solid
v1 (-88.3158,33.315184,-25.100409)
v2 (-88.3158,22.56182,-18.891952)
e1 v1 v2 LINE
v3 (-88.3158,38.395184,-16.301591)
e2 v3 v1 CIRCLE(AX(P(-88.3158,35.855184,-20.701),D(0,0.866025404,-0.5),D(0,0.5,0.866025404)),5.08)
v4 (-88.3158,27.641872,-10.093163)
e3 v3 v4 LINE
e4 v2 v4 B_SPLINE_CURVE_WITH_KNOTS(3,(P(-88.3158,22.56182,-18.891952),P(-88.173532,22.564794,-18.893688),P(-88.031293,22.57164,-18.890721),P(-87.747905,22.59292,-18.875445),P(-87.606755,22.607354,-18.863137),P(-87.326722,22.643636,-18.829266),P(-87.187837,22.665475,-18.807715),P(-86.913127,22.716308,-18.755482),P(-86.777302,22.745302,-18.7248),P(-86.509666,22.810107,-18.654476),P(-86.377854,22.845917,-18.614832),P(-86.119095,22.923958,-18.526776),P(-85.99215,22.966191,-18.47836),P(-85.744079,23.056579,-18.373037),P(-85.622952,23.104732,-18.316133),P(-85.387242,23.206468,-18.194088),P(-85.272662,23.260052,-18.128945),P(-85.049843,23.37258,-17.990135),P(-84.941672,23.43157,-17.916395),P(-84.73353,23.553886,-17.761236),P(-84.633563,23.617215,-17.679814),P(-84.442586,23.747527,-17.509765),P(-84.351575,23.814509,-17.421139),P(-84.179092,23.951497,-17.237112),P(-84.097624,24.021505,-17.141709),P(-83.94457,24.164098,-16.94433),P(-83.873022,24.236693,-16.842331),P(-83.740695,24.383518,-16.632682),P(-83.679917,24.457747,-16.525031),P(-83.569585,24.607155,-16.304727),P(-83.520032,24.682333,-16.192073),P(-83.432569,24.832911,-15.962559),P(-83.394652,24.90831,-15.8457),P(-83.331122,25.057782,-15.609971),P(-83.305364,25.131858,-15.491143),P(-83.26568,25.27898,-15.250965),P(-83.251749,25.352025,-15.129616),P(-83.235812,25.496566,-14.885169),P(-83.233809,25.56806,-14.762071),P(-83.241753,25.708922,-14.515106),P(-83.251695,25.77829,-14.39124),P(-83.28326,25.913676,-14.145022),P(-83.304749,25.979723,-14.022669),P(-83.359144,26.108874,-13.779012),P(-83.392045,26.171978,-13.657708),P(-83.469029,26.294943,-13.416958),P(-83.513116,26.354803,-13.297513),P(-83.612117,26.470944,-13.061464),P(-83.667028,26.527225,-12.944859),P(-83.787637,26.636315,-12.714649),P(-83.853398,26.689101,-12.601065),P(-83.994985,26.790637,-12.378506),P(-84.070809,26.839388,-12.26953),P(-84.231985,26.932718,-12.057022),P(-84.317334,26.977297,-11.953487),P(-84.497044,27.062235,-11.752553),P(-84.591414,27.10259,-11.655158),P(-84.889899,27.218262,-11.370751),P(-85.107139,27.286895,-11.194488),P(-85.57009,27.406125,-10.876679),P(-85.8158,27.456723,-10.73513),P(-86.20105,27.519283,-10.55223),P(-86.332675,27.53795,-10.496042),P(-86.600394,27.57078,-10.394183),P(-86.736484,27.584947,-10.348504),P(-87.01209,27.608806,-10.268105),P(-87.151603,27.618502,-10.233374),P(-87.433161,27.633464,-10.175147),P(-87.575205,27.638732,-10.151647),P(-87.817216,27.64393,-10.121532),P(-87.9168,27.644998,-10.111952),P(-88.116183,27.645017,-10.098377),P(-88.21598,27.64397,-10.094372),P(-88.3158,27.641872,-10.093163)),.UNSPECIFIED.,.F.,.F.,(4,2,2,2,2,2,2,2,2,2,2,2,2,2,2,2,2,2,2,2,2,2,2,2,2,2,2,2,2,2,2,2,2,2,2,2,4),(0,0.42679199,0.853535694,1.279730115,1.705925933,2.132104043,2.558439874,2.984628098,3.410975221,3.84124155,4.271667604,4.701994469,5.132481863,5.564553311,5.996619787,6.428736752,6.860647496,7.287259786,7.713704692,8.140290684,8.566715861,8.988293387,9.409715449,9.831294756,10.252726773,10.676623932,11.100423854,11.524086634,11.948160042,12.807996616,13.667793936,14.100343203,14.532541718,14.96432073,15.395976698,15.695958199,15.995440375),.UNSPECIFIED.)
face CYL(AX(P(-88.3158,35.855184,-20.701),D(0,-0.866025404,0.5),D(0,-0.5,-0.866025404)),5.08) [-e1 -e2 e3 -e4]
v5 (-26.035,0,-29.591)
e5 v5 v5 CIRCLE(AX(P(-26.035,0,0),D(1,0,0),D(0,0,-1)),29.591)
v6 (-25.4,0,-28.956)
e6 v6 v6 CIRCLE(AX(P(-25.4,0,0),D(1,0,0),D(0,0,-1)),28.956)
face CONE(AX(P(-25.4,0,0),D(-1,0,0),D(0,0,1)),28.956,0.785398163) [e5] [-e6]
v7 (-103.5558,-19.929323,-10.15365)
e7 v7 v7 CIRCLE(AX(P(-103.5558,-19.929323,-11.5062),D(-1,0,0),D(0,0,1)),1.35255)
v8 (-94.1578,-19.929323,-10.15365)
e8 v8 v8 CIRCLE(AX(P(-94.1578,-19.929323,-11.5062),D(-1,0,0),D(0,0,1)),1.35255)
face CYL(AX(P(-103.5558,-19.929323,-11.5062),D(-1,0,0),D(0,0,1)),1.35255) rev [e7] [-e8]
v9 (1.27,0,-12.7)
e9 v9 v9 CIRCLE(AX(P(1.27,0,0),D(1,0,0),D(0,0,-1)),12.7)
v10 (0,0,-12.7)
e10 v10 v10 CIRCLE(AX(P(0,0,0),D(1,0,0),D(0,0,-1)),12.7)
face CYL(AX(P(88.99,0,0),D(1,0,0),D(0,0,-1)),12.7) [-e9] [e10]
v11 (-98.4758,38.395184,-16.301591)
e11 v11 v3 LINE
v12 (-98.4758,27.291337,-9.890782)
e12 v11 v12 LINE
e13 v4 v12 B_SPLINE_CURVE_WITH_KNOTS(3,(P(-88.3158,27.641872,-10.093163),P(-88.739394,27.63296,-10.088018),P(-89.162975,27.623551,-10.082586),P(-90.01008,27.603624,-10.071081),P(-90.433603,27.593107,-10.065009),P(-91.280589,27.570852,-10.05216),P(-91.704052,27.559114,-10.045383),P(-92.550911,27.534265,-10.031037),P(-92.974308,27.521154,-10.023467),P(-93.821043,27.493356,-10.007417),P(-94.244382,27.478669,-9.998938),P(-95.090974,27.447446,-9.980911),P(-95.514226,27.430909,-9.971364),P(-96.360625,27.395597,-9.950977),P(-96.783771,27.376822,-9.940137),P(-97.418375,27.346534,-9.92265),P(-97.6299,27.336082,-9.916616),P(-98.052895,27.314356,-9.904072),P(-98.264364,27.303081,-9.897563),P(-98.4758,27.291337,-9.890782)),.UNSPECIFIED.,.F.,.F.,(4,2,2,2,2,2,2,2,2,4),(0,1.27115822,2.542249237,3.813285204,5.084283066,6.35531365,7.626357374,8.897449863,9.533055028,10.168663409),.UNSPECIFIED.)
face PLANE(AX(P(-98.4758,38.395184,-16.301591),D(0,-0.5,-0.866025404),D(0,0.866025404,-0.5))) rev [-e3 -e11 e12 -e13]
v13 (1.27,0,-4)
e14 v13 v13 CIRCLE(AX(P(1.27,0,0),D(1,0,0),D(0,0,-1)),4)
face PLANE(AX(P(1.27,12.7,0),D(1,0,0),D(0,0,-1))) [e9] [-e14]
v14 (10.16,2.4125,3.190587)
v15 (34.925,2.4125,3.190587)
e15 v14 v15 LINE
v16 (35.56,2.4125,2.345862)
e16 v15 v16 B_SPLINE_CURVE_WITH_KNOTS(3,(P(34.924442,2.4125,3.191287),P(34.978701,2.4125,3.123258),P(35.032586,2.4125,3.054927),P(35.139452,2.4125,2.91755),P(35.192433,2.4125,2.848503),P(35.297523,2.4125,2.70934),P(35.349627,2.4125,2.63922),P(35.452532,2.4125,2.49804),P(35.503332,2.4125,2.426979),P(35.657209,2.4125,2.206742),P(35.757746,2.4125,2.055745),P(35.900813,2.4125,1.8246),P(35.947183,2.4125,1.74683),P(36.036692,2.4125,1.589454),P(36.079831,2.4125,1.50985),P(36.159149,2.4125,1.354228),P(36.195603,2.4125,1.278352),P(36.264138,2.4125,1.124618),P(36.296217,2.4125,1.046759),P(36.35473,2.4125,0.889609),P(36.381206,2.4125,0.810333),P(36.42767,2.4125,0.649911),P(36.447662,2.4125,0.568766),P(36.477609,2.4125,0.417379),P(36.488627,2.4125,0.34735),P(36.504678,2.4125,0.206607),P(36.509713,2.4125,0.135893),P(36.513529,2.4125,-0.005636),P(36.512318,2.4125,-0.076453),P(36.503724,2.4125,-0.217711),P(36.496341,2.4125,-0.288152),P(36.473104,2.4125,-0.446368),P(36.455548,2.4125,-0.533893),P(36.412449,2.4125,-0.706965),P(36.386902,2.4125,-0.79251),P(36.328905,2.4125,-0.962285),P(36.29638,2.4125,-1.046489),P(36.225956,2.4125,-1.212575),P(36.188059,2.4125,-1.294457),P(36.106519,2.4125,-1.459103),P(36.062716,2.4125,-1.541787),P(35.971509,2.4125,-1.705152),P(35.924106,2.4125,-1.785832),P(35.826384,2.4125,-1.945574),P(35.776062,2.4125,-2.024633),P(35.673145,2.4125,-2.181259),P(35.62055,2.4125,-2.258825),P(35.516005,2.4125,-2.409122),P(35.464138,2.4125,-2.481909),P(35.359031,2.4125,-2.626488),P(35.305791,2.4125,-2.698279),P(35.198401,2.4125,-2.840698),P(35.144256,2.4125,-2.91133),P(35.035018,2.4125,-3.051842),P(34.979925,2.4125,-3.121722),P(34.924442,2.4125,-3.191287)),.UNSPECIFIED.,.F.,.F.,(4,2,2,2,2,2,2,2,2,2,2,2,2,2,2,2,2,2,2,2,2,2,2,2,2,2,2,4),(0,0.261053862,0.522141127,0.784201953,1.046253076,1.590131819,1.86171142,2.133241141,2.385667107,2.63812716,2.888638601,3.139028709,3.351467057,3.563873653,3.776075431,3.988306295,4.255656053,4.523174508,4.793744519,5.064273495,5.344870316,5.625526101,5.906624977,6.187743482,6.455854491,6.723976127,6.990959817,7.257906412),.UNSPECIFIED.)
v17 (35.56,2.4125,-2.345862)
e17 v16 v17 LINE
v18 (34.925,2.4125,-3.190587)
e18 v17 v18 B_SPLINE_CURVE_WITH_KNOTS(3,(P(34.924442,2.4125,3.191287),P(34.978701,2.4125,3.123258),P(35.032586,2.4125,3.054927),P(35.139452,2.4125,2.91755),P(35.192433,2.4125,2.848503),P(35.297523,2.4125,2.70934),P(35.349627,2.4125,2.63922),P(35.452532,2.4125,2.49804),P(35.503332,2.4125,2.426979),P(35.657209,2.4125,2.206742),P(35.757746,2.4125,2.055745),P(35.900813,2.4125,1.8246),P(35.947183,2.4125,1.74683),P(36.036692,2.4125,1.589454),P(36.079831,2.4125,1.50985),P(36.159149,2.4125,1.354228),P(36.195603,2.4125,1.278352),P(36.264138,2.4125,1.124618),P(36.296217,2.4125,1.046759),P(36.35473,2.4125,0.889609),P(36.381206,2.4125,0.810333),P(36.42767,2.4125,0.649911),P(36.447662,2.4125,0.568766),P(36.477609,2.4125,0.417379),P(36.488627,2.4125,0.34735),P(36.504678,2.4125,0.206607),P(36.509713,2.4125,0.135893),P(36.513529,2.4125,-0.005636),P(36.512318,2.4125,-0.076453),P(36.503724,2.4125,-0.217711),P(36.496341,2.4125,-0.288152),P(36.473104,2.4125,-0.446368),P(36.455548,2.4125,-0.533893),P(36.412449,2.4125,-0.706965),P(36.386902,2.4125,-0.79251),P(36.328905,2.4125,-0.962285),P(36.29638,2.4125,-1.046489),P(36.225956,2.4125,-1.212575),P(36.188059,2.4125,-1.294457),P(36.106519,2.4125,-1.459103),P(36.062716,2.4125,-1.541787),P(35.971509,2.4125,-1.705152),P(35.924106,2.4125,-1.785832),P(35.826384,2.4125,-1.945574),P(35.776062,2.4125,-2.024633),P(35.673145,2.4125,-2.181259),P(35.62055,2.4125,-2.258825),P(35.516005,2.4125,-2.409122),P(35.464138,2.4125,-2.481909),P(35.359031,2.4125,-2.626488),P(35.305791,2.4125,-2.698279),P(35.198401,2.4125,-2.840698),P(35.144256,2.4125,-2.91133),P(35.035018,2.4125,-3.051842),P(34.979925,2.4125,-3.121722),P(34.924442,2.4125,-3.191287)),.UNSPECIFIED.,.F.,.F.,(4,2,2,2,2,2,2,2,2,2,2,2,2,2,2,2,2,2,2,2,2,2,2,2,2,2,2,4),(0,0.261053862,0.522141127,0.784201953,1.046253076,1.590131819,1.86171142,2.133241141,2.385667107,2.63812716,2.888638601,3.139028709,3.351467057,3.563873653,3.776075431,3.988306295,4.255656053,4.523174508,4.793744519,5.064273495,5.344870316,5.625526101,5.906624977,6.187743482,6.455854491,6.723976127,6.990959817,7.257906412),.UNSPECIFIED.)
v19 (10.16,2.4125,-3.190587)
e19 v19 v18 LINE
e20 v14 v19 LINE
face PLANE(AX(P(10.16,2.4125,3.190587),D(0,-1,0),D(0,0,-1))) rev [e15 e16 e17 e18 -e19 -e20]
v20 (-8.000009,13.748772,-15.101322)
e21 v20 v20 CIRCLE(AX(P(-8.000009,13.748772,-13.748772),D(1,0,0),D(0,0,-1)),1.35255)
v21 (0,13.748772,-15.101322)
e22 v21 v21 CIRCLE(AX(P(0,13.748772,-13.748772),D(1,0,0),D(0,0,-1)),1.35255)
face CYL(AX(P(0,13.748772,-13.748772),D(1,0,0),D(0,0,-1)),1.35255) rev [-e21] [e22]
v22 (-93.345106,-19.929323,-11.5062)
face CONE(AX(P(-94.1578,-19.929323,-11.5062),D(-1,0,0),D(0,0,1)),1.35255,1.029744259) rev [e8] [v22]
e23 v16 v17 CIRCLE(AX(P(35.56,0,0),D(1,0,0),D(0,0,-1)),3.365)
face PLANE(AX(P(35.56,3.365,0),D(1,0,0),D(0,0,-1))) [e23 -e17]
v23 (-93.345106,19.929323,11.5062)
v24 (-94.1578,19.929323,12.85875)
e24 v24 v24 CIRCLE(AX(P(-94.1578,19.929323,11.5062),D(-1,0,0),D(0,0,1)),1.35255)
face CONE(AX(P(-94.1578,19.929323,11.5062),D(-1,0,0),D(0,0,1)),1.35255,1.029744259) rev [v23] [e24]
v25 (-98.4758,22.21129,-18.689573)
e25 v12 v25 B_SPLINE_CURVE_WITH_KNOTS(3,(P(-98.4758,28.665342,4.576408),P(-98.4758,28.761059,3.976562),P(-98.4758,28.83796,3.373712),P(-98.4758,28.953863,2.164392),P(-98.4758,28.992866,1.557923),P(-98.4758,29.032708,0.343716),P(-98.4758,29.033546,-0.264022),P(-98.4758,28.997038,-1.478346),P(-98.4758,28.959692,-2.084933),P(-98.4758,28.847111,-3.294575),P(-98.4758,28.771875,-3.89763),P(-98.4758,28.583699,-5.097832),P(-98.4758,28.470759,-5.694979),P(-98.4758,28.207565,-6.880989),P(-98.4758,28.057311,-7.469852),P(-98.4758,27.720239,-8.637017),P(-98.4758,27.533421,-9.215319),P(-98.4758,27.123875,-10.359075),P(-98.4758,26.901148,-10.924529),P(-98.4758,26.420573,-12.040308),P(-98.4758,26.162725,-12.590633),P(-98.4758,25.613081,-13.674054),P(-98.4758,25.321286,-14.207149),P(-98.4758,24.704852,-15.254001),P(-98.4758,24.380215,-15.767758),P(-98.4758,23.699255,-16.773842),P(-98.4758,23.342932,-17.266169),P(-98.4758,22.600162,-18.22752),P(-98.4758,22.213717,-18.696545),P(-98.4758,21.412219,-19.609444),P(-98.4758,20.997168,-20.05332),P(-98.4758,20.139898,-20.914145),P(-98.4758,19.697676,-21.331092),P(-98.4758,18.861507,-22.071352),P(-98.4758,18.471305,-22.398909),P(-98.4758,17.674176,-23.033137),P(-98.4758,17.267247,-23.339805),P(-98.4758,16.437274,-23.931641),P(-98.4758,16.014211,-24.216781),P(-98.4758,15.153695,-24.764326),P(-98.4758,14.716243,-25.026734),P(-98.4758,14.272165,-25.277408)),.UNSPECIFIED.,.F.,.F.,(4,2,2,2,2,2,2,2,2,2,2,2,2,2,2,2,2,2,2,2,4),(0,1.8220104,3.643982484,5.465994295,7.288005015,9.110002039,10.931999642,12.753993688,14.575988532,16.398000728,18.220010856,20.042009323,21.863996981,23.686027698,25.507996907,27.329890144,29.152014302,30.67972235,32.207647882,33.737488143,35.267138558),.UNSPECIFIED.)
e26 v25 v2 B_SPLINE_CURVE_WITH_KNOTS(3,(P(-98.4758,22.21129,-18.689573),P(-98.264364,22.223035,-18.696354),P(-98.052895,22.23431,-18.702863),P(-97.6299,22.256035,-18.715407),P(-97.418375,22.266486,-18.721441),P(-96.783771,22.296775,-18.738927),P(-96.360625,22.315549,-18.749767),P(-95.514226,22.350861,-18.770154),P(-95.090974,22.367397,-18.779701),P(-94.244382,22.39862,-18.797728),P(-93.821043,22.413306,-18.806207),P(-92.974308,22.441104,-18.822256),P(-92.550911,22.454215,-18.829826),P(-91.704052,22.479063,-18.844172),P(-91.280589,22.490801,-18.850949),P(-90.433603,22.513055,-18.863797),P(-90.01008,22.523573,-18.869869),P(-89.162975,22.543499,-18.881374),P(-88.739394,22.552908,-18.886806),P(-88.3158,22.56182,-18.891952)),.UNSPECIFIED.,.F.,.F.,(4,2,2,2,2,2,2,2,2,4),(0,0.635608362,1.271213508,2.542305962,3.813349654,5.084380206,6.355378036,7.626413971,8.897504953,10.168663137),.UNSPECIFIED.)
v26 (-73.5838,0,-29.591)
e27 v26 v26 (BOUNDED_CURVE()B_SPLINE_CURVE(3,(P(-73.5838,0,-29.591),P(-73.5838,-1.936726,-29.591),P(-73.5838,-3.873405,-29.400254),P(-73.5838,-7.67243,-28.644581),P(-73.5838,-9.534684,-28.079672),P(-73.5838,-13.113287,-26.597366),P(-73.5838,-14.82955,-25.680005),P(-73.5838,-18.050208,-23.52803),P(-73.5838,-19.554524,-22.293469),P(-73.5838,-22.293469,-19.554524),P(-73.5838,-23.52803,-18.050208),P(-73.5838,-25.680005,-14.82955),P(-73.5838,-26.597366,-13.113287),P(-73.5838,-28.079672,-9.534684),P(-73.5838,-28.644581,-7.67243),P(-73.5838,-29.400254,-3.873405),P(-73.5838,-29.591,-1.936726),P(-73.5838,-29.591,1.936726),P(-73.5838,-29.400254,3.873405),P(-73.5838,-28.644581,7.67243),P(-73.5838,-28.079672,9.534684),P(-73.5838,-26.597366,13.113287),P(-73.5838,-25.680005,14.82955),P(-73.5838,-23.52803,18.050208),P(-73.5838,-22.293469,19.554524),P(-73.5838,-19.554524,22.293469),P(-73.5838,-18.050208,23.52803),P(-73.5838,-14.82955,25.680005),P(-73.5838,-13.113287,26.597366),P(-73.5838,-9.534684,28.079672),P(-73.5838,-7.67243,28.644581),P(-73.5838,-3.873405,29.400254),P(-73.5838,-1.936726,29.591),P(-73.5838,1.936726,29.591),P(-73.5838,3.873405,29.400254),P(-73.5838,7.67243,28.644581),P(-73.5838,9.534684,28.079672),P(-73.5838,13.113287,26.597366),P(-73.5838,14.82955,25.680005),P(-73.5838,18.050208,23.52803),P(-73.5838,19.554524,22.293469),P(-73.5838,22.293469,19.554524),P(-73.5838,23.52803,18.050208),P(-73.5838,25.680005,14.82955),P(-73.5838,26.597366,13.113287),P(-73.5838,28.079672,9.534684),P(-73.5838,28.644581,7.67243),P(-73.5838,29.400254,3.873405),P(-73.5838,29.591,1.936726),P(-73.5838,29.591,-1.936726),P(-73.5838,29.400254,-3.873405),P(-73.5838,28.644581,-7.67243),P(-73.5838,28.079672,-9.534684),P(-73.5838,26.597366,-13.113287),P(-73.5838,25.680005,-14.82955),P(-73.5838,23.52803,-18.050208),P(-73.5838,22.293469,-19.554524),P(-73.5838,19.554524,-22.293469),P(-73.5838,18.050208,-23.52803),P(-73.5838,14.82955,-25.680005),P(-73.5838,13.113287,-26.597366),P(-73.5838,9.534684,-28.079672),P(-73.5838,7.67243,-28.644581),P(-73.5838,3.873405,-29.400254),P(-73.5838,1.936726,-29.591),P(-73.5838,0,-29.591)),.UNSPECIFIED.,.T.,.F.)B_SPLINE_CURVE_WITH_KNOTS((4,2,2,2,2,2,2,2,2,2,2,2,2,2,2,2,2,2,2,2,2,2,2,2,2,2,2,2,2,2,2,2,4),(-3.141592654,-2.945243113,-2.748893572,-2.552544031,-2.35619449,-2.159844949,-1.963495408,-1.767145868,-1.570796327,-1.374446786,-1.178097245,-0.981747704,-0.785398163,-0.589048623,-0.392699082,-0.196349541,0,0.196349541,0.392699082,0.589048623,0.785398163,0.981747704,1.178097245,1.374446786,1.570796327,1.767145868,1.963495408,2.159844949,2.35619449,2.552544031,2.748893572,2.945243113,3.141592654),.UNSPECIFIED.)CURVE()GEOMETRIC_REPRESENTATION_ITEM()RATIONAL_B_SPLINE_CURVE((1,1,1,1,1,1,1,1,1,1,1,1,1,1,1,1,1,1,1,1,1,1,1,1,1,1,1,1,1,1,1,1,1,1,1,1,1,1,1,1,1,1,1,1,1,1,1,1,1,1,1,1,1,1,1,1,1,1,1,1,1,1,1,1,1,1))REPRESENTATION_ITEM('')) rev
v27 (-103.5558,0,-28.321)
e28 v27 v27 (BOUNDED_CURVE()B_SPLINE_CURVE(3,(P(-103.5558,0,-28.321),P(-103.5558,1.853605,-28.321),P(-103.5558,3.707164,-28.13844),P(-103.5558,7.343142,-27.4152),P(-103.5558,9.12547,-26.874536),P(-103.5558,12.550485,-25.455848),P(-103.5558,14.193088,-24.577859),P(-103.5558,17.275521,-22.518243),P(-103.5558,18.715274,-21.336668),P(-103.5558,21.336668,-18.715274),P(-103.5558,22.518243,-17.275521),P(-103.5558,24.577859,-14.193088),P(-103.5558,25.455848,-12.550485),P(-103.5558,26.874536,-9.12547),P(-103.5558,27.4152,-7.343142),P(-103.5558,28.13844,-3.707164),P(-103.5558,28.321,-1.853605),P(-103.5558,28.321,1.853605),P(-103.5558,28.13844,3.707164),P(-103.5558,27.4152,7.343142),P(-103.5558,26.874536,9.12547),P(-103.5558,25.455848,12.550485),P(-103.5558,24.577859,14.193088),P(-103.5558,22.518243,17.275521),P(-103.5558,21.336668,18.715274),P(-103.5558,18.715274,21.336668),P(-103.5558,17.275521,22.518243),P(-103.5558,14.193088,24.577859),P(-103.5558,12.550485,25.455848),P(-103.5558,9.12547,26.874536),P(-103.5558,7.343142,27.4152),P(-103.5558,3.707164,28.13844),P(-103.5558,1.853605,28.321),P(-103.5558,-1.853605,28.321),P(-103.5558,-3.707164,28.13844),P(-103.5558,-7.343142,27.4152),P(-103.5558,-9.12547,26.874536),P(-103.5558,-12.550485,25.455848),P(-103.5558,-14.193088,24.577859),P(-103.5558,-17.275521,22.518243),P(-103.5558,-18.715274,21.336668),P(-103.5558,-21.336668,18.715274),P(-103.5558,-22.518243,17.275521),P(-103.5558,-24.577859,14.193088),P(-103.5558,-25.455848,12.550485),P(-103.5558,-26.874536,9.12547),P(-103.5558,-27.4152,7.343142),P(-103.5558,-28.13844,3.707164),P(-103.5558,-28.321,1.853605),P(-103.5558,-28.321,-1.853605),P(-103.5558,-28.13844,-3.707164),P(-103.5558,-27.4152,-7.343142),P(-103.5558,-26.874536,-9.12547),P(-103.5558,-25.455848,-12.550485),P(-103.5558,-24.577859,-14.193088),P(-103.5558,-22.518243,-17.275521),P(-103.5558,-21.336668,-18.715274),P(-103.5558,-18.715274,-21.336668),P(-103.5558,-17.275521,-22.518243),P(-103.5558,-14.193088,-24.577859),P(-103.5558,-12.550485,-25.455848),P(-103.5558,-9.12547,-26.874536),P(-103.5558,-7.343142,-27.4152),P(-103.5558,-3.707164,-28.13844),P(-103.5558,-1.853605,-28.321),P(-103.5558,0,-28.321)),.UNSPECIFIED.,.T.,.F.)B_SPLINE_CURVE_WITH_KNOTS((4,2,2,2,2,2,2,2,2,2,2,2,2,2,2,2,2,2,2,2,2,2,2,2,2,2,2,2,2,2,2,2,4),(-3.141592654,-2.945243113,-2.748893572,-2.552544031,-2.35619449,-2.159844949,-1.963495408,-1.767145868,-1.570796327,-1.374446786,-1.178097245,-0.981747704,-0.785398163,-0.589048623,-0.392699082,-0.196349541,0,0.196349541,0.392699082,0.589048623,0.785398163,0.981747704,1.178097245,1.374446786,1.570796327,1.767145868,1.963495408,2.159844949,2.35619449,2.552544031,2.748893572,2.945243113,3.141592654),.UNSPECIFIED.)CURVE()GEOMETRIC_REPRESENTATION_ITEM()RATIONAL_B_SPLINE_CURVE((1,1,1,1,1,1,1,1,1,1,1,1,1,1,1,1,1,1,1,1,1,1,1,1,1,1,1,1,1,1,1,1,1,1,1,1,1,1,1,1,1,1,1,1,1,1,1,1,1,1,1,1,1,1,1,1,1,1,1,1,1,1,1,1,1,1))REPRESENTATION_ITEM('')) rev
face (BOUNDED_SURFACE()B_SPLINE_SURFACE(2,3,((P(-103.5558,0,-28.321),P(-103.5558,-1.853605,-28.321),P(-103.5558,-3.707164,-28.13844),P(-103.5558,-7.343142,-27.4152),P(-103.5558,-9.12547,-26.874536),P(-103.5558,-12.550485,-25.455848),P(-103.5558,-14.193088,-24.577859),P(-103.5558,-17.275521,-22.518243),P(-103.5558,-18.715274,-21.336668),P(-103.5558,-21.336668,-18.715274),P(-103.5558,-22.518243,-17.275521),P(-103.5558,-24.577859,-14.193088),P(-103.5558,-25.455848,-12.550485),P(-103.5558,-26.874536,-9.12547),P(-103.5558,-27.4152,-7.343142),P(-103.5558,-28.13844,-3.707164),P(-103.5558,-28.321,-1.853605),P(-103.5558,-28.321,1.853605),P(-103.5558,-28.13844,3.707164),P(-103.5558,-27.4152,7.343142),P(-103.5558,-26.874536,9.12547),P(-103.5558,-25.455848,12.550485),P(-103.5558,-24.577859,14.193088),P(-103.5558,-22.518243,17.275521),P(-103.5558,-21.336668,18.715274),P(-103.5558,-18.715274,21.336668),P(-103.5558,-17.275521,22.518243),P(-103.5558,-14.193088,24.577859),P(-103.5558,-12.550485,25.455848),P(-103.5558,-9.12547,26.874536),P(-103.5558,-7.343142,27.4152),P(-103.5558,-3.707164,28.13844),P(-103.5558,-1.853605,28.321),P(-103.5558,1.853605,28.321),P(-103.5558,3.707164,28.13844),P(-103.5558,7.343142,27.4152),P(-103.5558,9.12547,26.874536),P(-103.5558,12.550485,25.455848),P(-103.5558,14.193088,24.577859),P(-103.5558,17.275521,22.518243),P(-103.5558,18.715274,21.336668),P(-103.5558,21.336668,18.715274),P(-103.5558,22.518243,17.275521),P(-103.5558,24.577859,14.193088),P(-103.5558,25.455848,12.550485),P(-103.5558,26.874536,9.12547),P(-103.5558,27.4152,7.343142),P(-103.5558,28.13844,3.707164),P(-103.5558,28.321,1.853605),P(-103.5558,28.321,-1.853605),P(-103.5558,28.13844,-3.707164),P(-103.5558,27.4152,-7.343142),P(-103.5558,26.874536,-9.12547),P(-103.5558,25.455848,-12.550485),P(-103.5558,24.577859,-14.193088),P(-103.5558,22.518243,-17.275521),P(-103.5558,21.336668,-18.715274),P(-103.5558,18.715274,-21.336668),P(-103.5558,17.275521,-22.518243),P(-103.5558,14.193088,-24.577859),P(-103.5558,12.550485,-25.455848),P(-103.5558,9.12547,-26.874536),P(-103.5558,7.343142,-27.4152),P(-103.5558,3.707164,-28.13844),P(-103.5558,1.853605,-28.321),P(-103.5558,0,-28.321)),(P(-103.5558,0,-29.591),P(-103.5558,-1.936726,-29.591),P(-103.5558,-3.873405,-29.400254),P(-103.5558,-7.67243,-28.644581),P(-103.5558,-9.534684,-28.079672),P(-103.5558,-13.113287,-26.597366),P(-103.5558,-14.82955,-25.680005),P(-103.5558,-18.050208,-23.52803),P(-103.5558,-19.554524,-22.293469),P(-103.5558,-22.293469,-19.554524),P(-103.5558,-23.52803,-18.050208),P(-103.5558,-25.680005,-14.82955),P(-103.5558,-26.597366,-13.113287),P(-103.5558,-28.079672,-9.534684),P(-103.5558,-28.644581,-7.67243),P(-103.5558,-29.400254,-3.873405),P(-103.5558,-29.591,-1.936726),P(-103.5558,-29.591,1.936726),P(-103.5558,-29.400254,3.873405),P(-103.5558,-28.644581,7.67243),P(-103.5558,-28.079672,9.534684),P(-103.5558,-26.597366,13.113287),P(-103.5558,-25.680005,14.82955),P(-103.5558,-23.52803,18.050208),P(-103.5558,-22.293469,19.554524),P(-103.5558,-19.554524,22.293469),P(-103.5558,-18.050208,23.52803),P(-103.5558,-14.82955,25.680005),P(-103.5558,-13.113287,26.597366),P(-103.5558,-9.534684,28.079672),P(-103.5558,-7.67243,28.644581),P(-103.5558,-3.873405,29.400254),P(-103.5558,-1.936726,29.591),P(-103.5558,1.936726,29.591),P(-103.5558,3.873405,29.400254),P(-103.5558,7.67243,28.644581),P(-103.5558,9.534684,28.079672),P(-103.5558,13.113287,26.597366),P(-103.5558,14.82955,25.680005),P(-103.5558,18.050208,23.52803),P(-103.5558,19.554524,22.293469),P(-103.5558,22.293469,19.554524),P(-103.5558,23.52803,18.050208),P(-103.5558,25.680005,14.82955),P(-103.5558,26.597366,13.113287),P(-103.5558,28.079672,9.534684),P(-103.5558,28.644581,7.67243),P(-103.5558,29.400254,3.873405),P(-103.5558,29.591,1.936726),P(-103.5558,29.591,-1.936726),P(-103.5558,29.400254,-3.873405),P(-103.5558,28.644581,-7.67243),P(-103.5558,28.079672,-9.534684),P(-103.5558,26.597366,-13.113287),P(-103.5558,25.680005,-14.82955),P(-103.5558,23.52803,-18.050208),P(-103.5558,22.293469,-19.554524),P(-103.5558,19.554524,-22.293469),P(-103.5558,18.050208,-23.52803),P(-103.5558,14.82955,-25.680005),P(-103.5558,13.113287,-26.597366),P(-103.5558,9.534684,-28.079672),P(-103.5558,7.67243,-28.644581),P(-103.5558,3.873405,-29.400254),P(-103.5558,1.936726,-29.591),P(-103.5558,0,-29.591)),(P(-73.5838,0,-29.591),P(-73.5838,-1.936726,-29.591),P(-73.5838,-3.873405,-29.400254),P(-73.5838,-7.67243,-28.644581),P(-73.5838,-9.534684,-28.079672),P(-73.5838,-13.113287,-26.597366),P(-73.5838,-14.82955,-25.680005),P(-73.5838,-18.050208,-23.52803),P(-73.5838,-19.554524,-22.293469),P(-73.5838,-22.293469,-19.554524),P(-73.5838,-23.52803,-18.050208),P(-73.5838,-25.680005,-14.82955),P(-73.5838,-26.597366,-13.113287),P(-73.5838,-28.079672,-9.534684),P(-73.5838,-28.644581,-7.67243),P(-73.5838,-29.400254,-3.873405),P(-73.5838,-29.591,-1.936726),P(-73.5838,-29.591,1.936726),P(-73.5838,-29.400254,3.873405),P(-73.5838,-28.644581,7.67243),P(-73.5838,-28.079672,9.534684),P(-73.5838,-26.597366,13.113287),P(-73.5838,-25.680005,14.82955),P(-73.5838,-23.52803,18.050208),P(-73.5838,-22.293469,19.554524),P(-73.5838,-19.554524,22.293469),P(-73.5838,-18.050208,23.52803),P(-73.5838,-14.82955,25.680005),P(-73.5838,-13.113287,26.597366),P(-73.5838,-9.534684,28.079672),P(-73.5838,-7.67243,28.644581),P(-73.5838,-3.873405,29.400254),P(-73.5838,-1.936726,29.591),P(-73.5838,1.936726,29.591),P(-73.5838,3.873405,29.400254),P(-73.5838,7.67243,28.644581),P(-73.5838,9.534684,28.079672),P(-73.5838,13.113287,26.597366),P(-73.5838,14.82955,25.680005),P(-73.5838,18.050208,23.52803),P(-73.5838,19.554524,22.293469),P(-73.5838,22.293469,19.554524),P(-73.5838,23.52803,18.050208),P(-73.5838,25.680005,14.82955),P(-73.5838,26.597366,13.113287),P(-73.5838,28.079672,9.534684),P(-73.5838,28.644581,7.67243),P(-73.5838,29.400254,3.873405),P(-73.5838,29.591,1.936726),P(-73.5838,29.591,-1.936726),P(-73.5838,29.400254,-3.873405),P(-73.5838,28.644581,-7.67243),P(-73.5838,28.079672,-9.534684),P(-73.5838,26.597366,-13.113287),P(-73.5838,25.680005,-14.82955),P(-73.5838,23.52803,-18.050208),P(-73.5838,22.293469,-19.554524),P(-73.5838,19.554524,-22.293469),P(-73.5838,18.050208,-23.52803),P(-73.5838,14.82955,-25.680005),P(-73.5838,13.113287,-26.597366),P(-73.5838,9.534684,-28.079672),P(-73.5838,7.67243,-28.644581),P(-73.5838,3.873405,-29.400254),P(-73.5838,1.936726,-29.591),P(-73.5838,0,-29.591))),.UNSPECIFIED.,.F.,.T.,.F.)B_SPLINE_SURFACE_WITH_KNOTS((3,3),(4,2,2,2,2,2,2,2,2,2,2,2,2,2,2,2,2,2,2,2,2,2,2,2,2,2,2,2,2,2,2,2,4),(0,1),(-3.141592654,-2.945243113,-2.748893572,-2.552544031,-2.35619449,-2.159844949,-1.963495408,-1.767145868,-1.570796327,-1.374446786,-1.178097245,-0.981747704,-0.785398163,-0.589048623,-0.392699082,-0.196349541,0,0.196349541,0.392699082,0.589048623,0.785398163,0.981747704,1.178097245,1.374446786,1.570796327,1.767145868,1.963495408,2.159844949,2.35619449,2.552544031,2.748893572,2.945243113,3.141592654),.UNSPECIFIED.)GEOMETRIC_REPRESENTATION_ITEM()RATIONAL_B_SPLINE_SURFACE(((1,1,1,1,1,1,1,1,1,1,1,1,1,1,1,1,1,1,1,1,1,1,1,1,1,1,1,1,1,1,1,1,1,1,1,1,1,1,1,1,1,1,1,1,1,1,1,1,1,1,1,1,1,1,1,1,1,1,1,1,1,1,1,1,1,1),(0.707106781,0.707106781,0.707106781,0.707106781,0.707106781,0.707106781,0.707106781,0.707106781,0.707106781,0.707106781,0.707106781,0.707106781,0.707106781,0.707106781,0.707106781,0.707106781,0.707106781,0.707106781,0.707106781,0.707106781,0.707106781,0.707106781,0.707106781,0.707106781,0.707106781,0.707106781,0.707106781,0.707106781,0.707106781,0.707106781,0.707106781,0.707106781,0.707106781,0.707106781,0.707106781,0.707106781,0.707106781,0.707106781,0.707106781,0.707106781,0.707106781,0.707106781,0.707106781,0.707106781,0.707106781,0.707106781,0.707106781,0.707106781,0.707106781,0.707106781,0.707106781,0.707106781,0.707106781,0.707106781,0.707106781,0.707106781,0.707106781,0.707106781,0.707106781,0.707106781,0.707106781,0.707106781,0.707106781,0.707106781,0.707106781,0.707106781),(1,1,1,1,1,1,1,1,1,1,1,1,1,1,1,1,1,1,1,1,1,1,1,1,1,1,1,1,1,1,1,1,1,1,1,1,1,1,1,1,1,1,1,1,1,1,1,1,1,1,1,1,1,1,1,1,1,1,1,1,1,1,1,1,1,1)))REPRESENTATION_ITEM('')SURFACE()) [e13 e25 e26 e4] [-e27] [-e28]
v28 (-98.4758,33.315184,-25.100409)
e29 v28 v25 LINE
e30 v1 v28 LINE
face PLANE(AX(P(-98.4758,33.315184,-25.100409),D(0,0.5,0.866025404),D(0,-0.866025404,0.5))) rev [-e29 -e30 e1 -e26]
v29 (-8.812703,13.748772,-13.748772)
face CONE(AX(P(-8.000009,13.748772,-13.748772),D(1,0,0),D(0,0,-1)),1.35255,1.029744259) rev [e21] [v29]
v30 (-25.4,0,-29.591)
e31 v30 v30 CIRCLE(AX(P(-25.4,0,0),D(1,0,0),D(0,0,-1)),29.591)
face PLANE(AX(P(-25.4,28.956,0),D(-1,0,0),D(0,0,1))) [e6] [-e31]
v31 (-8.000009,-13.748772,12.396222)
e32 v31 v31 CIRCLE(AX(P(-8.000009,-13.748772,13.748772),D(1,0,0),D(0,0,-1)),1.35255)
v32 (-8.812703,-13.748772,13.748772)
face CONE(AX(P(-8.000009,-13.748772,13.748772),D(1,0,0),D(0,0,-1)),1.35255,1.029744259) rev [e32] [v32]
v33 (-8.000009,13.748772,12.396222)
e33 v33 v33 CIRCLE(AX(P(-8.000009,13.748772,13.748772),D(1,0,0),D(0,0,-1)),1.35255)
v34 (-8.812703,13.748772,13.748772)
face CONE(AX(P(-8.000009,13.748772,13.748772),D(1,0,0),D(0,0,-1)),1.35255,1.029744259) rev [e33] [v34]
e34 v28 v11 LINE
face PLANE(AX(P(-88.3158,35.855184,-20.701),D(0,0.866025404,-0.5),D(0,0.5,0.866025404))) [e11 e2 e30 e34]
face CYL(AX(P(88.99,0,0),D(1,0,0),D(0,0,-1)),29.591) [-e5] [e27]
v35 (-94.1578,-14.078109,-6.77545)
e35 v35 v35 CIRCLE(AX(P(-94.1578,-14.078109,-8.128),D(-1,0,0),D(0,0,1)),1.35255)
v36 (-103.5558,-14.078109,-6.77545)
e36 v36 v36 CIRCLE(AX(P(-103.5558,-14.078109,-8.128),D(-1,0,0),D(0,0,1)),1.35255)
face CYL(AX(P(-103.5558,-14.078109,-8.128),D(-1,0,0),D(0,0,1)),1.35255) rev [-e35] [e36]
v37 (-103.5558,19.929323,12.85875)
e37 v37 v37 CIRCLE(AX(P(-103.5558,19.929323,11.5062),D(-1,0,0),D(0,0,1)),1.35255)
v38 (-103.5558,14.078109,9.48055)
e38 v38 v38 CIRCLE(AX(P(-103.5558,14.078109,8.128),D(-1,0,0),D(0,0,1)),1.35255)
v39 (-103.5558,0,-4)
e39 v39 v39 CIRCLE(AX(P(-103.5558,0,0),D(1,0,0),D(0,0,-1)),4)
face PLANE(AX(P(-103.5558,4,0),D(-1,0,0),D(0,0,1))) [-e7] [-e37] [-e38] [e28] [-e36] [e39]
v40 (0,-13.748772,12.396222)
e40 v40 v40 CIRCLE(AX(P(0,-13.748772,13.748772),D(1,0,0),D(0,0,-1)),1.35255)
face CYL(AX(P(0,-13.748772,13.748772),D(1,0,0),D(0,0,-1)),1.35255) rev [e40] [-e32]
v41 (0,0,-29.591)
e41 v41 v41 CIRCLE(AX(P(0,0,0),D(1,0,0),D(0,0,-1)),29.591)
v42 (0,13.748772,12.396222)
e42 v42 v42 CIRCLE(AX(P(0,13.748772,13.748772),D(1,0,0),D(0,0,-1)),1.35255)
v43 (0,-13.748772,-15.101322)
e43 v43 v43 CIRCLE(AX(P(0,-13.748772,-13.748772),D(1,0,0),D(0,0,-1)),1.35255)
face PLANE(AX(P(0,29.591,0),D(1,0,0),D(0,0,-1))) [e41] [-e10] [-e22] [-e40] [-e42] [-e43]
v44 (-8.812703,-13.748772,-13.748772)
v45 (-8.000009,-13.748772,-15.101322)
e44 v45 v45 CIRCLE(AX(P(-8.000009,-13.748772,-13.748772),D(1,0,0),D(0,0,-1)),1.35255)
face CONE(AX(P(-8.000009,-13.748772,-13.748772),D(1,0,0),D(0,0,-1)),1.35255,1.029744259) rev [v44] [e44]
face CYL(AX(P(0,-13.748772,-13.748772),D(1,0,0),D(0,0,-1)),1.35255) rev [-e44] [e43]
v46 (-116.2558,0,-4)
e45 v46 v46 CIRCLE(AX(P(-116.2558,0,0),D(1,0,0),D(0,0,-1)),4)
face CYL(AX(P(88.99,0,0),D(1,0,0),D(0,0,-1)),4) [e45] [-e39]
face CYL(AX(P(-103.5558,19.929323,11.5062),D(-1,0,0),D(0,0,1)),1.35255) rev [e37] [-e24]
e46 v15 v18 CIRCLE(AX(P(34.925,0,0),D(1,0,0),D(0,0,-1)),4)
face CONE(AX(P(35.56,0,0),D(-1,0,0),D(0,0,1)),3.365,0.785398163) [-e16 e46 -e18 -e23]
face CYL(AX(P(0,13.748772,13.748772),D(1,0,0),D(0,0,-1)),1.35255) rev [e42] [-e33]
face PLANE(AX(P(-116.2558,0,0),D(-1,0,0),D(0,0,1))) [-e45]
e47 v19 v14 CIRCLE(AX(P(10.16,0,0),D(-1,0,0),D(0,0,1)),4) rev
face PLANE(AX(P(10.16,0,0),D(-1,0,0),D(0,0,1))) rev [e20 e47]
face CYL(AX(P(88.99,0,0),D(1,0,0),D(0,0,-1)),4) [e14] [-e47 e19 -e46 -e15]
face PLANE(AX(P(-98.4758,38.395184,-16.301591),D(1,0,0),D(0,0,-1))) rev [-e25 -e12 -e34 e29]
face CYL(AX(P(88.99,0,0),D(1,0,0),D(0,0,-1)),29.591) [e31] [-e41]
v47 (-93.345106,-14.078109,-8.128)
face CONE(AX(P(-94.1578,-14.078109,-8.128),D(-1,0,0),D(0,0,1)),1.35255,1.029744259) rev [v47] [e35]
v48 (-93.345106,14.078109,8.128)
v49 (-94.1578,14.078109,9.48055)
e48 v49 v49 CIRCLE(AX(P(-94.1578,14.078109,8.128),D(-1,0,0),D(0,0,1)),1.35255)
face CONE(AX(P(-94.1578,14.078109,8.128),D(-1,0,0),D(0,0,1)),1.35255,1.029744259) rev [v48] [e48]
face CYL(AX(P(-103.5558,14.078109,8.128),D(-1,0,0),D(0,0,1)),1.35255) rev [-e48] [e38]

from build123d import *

# Parameters (mm, degrees)
FILLET1_SIZE                   = 1.27
FILLET1_SIZE_2                 = 29.972
SKETCH3_W                      = 6.381173482
SKETCH3_H                      = 3.175
CUT_EXTRUDE1_DEPTH             = 25.4
F_6_32_TAPPED_HOLE2_AT_2_COUNT = 2
F_6_32_TAPPED_HOLE2_AT_2_PITCH = 27.497544243
F_6_32_TAPPED_HOLE2_AT_3_COUNT = 2
F_6_32_TAPPED_HOLE2_AT_3_PITCH = 38.8874
F_6_32_TAPPED_HOLE2_AT_4_COUNT = 2
F_6_32_TAPPED_HOLE2_AT_4_PITCH = 27.497544243
F_6_32_TAPPED_HOLE1_AT_2_COUNT = 2
F_6_32_TAPPED_HOLE1_AT_2_PITCH = 46.0248
F_6_32_TAPPED_HOLE1_AT_3_COUNT = 2
F_6_32_TAPPED_HOLE1_AT_3_PITCH = 39.2684
F_6_32_TAPPED_HOLE1_AT_4_COUNT = 2
F_6_32_TAPPED_HOLE1_AT_4_PITCH = 6.7564
BOSS_EXTRUDE1_DEPTH            = 41.402


with BuildPart() as part:
    # Sketch2 → Revolve1 (revolve)
    with BuildSketch(Plane.XY, mode=Mode.PRIVATE) as revolve1_sk:
        Polygon((35.56, 0), (-116.2558, 0), (-116.2558, 4), (-103.5558, 4), (-103.5558, 29.591), (-26.035, 29.591), (-25.4, 28.956), (-25.4, 29.591), (0, 29.591), (0, 12.7), (1.27, 12.7), (1.27, 4), (34.925, 4), (35.56, 3.365), align=None)
    revolve(revolve1_sk.sketch.rotate(Axis((88.99, 0, 0), (-1, 0, 0)), 90), axis=Axis((88.99, 0, 0), (-1, 0, 0)))

    # Fillet1
    # an asymmetric fillet: 29.972, 1.27 mm, written as the material it takes off along each edge
    with BuildSketch(Plane(origin=(-103.5558, 0, 0), x_dir=(0, 0, -1), z_dir=(0, 1, 0))) as fillet1_piece_1:
        with BuildLine():
            Bezier((29.591 - FILLET1_SIZE, 0), (29.591, 0), (29.591, -FILLET1_SIZE_2), weights=[1, 0.707106781, 1])
            Line((29.591, -FILLET1_SIZE_2), (29.591, 0))
            Line((29.591, 0), (29.591 - FILLET1_SIZE, 0))
        make_face()
    revolve(axis=Axis((-103.5558, 0, 0), (-1, 0, 0)), mode=Mode.SUBTRACT)

    # Sketch3 → Cut-Extrude1 (cut)
    with BuildSketch(Plane(origin=(35.56, 0, 0), x_dir=(0, 0, -1), z_dir=(1, 0, 0))):
        with Locations((0, 4)):
            Rectangle(SKETCH3_W, SKETCH3_H)
    extrude(amount=-CUT_EXTRUDE1_DEPTH, mode=Mode.SUBTRACT)

    # Sketch8 → #6-32 Tapped Hole2 (revolve, cut)
    with BuildSketch(Plane(origin=(0, 13.748772121, 13.748772121), x_dir=(0, 0, -1), z_dir=(0, 1, 0))):
        Polygon((0, 0), (0, 8.81270343), (1.35255, 8.0000094), (1.35255, 0), align=None)
    f_6_32_tapped_hole2 = revolve(axis=Axis((6.35, 13.748772121, 13.748772121), (-1, 0, 0)), mode=Mode.SUBTRACT)

    # #6-32 Tapped Hole2 at 2: #6-32 Tapped Hole2 ×2
    with Locations(*[(0, 0, -i * F_6_32_TAPPED_HOLE2_AT_2_PITCH) for i in range(1, F_6_32_TAPPED_HOLE2_AT_2_COUNT)]):
        add(f_6_32_tapped_hole2, mode=Mode.SUBTRACT)

    # #6-32 Tapped Hole2 at 3: #6-32 Tapped Hole2 ×2
    with Locations(*[Vector(0, -0.7071067811865461, -0.7071067811865489) * (i * F_6_32_TAPPED_HOLE2_AT_3_PITCH) for i in range(1, F_6_32_TAPPED_HOLE2_AT_3_COUNT)]):
        add(f_6_32_tapped_hole2, mode=Mode.SUBTRACT)

    # #6-32 Tapped Hole2 at 4: #6-32 Tapped Hole2 ×2
    with Locations(*[(0, -i * F_6_32_TAPPED_HOLE2_AT_4_PITCH, 0) for i in range(1, F_6_32_TAPPED_HOLE2_AT_4_COUNT)]):
        add(f_6_32_tapped_hole2, mode=Mode.SUBTRACT)

    # Sketch7 → #6-32 Tapped Hole1 (revolve, cut)
    with BuildSketch(Plane(origin=(-103.5558, -19.929323002, -11.5062), x_dir=(0, 0, 1), z_dir=(0, 1, 0))):
        Polygon((0, 0), (0, 10.21069403), (1.35255, 9.398), (1.35255, 0), align=None)
    f_6_32_tapped_hole1 = revolve(axis=Axis((-109.9058, -19.929323002, -11.5062), (1, 0, 0)), mode=Mode.SUBTRACT)

    # #6-32 Tapped Hole1 at 2: #6-32 Tapped Hole1 ×2
    with Locations(*[Vector(0, 0.8660254037844364, 0.5000000000000039) * (i * F_6_32_TAPPED_HOLE1_AT_2_PITCH) for i in range(1, F_6_32_TAPPED_HOLE1_AT_2_COUNT)]):
        add(f_6_32_tapped_hole1, mode=Mode.SUBTRACT)

    # #6-32 Tapped Hole1 at 3: #6-32 Tapped Hole1 ×2
    with Locations(*[Vector(0, 0.8660254037844366, 0.5000000000000038) * (i * F_6_32_TAPPED_HOLE1_AT_3_PITCH) for i in range(1, F_6_32_TAPPED_HOLE1_AT_3_COUNT)]):
        add(f_6_32_tapped_hole1, mode=Mode.SUBTRACT)

    # #6-32 Tapped Hole1 at 4: #6-32 Tapped Hole1 ×2
    with Locations(*[Vector(0, 0.8660254037844365, 0.5000000000000039) * (i * F_6_32_TAPPED_HOLE1_AT_4_PITCH) for i in range(1, F_6_32_TAPPED_HOLE1_AT_4_COUNT)]):
        add(f_6_32_tapped_hole1, mode=Mode.SUBTRACT)

    # Sketch12 → Boss-Extrude1 (add)
    with BuildSketch(Plane(origin=(0, 0, 0), x_dir=(1, 0, 0), z_dir=(0, 0.866025403784438, -0.500000000000001))):
        with BuildLine():
            Line((-98.4758, -5.08), (-88.3158, -5.08))
            ThreePointArc((-88.3158, -5.08), (-83.2358, 0), (-88.3158, 5.08))
            Line((-88.3158, 5.08), (-98.4758, 5.08))
            Line((-98.4758, 5.08), (-98.4758, -5.08))
        make_face()
    extrude(amount=BOSS_EXTRUDE1_DEPTH)


solid = part.part
